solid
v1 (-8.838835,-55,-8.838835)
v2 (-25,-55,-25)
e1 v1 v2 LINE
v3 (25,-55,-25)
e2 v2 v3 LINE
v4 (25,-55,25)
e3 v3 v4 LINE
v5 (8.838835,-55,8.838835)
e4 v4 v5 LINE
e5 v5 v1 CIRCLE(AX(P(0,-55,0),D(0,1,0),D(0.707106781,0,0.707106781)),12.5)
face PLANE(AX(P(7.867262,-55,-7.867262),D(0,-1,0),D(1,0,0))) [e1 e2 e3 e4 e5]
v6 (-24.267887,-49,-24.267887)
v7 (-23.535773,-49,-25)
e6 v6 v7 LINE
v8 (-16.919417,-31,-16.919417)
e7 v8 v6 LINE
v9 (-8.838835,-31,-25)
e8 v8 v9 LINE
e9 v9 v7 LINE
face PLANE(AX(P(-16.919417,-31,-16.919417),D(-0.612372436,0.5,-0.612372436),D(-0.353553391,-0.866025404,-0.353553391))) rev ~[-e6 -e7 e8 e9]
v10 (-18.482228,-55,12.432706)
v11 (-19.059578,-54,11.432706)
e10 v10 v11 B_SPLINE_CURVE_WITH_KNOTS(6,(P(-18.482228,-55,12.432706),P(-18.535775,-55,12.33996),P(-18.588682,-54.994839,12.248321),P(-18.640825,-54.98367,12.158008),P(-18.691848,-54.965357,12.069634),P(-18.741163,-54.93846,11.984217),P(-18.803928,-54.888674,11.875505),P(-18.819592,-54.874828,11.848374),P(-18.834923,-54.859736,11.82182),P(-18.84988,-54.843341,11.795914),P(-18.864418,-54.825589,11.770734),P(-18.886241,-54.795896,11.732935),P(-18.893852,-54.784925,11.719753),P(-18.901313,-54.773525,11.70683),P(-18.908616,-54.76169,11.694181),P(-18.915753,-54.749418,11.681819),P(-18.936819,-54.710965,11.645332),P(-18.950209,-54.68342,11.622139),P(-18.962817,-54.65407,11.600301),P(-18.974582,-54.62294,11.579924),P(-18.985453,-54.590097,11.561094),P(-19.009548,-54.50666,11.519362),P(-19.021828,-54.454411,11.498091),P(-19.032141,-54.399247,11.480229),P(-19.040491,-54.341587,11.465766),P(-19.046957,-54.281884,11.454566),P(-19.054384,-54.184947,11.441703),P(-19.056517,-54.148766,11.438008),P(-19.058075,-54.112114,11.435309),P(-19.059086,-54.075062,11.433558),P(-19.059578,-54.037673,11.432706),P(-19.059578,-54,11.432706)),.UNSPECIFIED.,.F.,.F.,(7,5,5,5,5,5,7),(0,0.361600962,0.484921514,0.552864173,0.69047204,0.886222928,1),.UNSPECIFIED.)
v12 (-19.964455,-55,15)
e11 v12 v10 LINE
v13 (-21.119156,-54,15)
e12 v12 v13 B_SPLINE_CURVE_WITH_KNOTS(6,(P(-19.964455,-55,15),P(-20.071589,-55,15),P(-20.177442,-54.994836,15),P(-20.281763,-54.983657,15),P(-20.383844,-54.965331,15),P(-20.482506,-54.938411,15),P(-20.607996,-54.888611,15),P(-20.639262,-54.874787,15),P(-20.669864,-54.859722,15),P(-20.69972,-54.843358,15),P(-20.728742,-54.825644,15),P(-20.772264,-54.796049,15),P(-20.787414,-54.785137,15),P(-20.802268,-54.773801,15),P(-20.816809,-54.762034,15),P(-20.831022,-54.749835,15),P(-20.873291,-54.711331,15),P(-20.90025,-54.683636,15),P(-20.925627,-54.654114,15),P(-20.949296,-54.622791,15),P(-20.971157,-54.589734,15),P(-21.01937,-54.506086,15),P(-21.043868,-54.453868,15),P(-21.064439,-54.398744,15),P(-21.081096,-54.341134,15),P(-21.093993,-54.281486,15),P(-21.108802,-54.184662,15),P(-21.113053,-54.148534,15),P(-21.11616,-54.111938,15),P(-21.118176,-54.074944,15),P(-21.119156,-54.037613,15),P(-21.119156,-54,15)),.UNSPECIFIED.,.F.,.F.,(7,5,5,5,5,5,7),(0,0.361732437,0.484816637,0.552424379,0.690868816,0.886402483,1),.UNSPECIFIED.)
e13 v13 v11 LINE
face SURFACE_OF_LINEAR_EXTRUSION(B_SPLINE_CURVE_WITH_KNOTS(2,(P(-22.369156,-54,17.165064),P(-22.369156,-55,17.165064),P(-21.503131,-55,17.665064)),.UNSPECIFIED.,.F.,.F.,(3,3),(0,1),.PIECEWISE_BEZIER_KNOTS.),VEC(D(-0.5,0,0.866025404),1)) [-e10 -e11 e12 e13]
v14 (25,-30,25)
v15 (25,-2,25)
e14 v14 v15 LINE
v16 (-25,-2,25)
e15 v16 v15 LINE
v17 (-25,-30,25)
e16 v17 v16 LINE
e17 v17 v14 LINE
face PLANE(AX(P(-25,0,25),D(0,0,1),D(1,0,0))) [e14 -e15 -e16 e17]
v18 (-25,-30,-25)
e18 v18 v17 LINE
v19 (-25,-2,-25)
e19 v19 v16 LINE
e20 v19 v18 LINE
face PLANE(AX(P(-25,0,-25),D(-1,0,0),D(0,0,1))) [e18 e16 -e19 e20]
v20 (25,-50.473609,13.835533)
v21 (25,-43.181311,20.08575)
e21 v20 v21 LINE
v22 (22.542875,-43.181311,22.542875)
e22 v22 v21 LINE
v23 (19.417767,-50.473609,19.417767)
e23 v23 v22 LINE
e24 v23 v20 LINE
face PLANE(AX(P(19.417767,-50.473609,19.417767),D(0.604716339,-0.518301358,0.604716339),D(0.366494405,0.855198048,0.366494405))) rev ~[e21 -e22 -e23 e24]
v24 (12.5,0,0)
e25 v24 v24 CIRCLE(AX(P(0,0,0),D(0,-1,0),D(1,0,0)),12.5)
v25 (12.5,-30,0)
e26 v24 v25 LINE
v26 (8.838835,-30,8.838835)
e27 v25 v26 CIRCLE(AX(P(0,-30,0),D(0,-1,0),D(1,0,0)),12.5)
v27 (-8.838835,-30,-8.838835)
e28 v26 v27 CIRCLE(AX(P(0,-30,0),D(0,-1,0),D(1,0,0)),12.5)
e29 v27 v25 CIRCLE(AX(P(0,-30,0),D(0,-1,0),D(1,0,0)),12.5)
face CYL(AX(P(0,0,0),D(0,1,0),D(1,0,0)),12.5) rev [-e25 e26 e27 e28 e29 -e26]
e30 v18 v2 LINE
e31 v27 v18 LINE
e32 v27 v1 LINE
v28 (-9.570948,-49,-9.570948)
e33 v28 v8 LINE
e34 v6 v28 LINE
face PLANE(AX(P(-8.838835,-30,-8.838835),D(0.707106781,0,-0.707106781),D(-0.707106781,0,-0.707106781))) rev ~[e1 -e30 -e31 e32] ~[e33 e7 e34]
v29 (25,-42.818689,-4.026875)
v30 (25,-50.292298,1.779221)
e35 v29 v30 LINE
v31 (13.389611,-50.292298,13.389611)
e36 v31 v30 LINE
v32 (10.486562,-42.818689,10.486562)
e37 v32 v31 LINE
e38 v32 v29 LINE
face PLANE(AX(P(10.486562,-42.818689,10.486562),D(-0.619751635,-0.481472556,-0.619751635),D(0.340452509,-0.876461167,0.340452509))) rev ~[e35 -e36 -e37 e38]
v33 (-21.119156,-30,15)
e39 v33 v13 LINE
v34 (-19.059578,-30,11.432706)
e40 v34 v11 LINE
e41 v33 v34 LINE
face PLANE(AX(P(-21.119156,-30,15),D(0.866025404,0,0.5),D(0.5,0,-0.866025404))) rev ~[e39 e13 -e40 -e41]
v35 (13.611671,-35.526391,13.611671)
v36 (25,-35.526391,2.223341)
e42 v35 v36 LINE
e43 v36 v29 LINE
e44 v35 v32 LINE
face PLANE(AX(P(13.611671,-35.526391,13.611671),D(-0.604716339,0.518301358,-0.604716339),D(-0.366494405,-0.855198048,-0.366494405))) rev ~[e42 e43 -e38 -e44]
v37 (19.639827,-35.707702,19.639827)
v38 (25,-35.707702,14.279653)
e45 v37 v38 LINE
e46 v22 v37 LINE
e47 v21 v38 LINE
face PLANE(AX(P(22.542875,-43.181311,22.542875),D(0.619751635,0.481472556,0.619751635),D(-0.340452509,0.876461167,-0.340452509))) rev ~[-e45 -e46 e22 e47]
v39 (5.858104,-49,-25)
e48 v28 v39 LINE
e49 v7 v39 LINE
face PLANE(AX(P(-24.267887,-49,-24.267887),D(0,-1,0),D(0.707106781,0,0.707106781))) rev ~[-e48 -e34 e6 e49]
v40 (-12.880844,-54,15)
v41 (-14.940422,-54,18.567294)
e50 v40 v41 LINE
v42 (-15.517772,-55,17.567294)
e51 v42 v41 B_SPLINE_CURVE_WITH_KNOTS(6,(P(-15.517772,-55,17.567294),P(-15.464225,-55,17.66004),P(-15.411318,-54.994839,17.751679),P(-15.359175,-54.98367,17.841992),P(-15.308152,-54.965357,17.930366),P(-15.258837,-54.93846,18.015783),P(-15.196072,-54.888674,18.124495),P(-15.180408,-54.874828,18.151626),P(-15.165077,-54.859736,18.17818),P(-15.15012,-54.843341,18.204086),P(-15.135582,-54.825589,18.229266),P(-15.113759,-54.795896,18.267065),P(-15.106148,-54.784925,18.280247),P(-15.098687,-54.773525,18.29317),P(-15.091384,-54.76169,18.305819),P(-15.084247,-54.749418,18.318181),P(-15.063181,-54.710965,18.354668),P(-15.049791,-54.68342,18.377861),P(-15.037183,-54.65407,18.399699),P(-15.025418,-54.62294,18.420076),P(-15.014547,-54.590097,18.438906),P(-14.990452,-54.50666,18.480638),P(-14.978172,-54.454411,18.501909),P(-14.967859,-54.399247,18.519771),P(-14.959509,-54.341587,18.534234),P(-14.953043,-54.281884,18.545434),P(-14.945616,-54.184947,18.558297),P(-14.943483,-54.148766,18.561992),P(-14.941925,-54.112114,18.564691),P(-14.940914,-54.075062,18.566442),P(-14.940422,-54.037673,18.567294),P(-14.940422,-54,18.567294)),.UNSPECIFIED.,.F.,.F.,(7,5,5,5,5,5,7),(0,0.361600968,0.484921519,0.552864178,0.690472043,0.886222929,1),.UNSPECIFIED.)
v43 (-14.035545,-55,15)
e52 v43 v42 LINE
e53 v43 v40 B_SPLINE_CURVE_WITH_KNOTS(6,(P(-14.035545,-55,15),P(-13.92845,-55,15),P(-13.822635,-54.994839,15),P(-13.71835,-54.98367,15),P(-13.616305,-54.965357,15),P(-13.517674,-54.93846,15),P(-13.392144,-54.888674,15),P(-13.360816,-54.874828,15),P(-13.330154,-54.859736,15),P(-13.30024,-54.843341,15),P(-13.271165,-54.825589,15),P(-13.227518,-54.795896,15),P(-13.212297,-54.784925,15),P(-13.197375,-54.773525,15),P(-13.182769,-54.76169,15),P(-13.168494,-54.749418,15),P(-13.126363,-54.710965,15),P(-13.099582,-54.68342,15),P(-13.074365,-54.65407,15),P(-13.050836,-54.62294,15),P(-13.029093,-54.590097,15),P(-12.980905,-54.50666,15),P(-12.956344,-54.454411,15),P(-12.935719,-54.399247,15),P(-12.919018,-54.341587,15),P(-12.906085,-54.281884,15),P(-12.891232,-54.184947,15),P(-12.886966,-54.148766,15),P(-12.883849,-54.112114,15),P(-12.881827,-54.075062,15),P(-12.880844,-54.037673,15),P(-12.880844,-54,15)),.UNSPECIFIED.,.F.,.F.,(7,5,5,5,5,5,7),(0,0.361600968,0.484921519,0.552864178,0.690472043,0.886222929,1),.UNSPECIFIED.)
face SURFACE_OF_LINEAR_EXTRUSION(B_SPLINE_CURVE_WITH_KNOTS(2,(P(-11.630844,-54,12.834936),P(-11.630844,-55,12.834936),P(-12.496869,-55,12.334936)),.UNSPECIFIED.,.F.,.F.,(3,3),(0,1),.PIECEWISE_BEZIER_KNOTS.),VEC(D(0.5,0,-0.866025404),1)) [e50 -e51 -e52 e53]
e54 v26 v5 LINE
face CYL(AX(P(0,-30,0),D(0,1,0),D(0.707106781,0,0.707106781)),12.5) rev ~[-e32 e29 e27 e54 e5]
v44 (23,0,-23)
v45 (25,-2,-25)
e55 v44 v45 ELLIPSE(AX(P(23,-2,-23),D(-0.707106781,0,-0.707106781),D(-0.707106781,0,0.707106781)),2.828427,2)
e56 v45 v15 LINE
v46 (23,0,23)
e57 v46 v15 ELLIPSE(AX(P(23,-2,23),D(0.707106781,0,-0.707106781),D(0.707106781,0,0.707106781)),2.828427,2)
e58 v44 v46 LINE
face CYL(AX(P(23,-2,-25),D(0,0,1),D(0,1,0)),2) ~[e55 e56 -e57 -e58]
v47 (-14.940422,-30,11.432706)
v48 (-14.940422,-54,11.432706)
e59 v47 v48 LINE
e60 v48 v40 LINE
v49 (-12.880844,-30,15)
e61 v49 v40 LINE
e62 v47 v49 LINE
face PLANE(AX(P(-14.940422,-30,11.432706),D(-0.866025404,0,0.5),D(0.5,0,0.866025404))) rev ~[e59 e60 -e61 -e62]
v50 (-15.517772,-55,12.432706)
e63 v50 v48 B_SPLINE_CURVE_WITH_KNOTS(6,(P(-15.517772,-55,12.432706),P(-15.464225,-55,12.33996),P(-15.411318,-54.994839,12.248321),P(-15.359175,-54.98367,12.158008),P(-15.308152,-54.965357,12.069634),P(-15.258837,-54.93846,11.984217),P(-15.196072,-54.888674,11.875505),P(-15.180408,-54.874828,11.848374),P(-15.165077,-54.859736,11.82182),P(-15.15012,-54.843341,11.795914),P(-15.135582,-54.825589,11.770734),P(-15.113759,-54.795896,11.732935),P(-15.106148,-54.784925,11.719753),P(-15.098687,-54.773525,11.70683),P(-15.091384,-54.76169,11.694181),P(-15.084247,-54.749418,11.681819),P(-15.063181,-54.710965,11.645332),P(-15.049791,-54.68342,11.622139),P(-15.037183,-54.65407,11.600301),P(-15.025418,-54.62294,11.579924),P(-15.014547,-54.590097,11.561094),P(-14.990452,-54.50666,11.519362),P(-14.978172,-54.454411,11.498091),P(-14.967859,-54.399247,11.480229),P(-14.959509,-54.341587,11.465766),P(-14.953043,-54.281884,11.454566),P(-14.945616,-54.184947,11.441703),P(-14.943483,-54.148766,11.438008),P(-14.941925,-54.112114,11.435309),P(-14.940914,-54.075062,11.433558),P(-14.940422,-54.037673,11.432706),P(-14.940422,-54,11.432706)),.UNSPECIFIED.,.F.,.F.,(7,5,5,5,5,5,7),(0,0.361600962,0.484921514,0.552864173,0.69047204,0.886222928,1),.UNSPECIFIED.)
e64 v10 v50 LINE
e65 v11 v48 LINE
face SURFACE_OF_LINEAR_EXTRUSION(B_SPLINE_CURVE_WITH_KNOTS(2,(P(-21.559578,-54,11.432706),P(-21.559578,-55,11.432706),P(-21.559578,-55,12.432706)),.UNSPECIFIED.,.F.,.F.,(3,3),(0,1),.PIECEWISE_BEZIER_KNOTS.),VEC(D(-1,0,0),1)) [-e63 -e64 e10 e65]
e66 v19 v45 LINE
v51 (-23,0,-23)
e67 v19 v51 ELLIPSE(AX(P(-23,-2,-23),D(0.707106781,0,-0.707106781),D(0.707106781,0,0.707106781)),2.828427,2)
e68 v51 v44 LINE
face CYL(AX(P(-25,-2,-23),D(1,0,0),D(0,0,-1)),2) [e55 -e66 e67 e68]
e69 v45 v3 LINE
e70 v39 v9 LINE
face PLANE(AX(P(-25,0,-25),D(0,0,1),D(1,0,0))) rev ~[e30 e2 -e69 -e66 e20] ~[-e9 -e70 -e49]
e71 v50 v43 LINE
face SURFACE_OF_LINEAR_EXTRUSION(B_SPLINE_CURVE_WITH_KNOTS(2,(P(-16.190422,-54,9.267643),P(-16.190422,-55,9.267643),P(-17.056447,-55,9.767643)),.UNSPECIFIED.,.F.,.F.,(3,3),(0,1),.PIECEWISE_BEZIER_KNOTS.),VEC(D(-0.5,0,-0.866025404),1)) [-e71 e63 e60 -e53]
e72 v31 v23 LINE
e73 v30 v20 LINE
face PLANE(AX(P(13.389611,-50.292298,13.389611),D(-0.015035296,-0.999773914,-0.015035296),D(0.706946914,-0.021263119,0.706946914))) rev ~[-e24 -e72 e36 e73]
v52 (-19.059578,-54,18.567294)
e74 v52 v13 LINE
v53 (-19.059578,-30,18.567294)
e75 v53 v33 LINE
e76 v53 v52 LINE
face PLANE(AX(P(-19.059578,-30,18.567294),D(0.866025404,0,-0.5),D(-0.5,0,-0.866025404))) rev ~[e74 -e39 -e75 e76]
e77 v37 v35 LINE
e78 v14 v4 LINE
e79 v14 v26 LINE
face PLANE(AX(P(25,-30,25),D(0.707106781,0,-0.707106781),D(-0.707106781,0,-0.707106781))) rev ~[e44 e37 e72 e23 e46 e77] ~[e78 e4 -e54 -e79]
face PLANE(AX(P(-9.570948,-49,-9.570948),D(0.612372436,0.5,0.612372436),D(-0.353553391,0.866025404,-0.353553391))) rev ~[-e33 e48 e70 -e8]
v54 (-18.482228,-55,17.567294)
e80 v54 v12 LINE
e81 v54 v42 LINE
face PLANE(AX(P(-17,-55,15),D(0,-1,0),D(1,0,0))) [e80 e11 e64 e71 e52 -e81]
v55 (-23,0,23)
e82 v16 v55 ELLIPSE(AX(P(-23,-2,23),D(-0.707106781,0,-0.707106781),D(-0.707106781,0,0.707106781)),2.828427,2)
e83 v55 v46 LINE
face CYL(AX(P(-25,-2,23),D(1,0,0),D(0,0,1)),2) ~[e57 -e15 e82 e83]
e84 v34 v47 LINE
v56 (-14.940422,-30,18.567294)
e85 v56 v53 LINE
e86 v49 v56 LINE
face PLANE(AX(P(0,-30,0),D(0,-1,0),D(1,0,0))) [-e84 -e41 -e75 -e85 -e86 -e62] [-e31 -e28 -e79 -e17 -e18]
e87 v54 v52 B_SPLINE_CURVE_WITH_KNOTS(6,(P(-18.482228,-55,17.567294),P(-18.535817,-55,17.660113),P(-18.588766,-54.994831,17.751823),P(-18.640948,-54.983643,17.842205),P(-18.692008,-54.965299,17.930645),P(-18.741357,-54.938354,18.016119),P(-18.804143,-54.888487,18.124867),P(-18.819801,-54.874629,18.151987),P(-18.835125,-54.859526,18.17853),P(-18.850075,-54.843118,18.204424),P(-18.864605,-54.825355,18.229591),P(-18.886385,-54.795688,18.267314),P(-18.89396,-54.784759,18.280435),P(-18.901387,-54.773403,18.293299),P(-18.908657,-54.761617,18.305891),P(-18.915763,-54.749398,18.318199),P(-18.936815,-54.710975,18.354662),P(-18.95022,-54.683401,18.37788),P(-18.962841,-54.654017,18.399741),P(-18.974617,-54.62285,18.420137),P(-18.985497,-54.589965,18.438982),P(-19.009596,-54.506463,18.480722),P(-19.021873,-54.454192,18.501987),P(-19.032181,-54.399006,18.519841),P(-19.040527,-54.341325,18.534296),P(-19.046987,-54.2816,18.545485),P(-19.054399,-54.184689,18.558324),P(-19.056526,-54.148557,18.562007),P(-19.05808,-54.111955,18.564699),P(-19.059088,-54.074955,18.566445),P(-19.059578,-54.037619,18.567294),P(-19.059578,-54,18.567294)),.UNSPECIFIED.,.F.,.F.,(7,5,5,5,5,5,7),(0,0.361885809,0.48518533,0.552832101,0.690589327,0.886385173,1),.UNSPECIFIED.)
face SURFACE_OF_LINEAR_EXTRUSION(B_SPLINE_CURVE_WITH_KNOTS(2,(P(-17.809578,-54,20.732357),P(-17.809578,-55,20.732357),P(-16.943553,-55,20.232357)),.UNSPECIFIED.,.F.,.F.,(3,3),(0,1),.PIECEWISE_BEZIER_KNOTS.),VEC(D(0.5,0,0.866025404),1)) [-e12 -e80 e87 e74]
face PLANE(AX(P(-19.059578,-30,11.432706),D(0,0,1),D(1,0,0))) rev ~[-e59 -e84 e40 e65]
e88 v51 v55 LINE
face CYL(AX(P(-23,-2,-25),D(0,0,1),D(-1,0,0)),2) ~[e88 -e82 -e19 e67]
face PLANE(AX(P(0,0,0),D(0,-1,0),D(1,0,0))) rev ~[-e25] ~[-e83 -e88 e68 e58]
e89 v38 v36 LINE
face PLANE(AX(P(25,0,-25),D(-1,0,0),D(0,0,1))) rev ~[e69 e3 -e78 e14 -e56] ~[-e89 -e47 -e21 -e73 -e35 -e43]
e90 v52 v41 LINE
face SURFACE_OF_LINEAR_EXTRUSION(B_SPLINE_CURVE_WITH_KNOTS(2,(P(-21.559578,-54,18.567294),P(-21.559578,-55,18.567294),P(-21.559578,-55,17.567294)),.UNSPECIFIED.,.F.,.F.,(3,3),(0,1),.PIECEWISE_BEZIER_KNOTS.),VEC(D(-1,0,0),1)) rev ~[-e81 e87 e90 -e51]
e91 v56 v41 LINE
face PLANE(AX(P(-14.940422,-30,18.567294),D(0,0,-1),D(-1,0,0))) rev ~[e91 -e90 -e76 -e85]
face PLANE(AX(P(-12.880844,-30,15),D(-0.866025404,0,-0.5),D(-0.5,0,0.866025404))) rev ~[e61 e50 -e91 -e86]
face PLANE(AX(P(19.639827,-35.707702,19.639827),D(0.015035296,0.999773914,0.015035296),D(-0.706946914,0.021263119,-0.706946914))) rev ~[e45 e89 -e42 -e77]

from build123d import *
from build123d import SkipClean  # not in build123d's __all__

# Parameters (mm, degrees)
F0_W        = 50
F0_H        = 50
F0_R        = 12.5
F1_DEPTH    = 30
F2_DEPTH    = 25
F4_DEPTH    = 25
F6_DEPTH    = 50
F8_DEPTH    = 25
F9_T1_DEPTH = 9.1191559928
F9_T3_DEPTH = 9.1191559928
F9_T5_DEPTH = 9.1191559928
F9_T7_DEPTH = 9.1191559928
F9_T9_DEPTH = 9.1191559928
F10_R       = 2


# Not quite as in the source:
# - a fillet or chamfer that OpenCascade refuses, or shapes differently, is made with other operations: its cross-section is extruded or revolved along the edge and cut away or added
# - after a boolean that leaves OpenCascade's solid faulty, fix() repairs it


with BuildPart() as f1:
    # F0 (on Front) → F1 (new body)
    with BuildSketch(Plane.XZ):
        Rectangle(F0_W, F0_H)
        Circle(F0_R, mode=Mode.SUBTRACT)
    extrude(amount=F1_DEPTH)

    # F0 (on Front) → F2 (join)
    with BuildSketch(Plane.XZ):
        Rectangle(F0_W, F0_H)
        Circle(F0_R, mode=Mode.SUBTRACT)
    extrude(amount=F2_DEPTH)

    # F3 (on face) → F4 (join)
    with BuildSketch(Plane.XZ.offset(30)):
        with BuildLine():
            Line((-8.8388347648, -8.8388347648), (-25, -25))
            Line((-25, -25), (25, -25))
            Line((25, -25), (25, 25))
            Line((25, 25), (8.8388347648, 8.8388347648))
            ThreePointArc((8.8388347648, 8.8388347648), (8.8388347648, -8.8388347648), (-8.8388347648, -8.8388347648))
        make_face()
    with SkipClean():  # cleaning this boolean's faces spoils the solid; the shape is the same uncleaned
        extrude(amount=F4_DEPTH)

    # F5 (on face) → F6 (cut)
    with BuildSketch(Plane(origin=(0, 0, 0), x_dir=(0.7071067812, 0, 0.7071067812), z_dir=(-0.7071067812, 0, 0.7071067812))):
        Polygon((-23.9276695297, -31), (-34.3199743751, -49), (-13.5353646843, -49), align=None)
        Polygon((19.249809042, -35.5263909924), (14.8302387921, -42.8186887872), (18.9357688095, -50.2922977948), (27.4608690767, -50.4736090076), (31.8804393265, -43.1813112128), (27.7749093092, -35.7077022052), align=None)
    extrude(amount=-F6_DEPTH, mode=Mode.SUBTRACT)

    add(f1.part.fix(), mode=Mode.REPLACE)

    # F7 (on face) → F8 (join)
    with BuildSketch(Plane.XZ.offset(30)):
        Polygon((-19.0595779964, 11.4327062681), (-14.9404220036, 11.4327062681), (-12.8808440072, 15), (-14.9404220036, 18.5672937319), (-19.0595779964, 18.5672937319), (-21.1191559928, 15), align=None)
    extrude(amount=F8_DEPTH)

    # F9: fillet of radius 1 on 6 edges, made by hand

    # F9_s2 → F9_t1 (cut)
    with BuildSketch(Plane(origin=(4.5249795266, 0, 7.8374944433), x_dir=(0, 1, 0), z_dir=(-0.5, 0, -0.8660254038))):
        with BuildLine():
            add(Edge.make_bspline(
                [(-54, -25.7897255963), (-55, -25.7897255963), (-55, -24.7897255963)],
                knots=[0, 0, 0, 1, 1, 1], degree=2, weights=[1, 1, 1]))
            Line((-55, -24.7897255963), (-55, -25.7897255963))
            Line((-55, -25.7897255963), (-54, -25.7897255963))
        make_face()
    extrude(amount=F9_T1_DEPTH, mode=Mode.SUBTRACT)

    # F9_s4 → F9_t3 (cut)
    with BuildSketch(Plane(origin=(-13.0249795266, 0, 22.5599263076), x_dir=(0, 1, 0), z_dir=(0.5, 0, -0.8660254038))):
        with BuildLine():
            add(Edge.make_bspline(
                [(-54, -10.7897255963), (-55, -10.7897255963), (-55, -9.7897255963)],
                knots=[0, 0, 0, 1, 1, 1], degree=2, weights=[1, 1, 1]))
            Line((-55, -9.7897255963), (-55, -10.7897255963))
            Line((-55, -10.7897255963), (-54, -10.7897255963))
        make_face()
    extrude(amount=F9_T3_DEPTH, mode=Mode.SUBTRACT)

    # F9_s6 → F9_t5 (cut)
    with BuildSketch(Plane.YZ.offset(-21.5595779964)):
        with BuildLine():
            add(Edge.make_bspline(
                [(-54, 11.4327062681), (-55, 11.4327062681), (-55, 12.4327062681)],
                knots=[0, 0, 0, 1, 1, 1], degree=2, weights=[1, 1, 1]))
            Line((-55, 12.4327062681), (-55, 11.4327062681))
            Line((-55, 11.4327062681), (-54, 11.4327062681))
        make_face()
        with BuildLine():
            add(Edge.make_bspline(
                [(-54, 18.5672937319), (-55, 18.5672937319), (-55, 17.5672937319)],
                knots=[0, 0, 0, 1, 1, 1], degree=2, weights=[1, 1, 1]))
            Line((-55, 17.5672937319), (-55, 18.5672937319))
            Line((-55, 18.5672937319), (-54, 18.5672937319))
        make_face()
    extrude(amount=F9_T5_DEPTH, mode=Mode.SUBTRACT)

    # F9_s8 → F9_t7 (cut)
    with BuildSketch(Plane(origin=(-0.0345984698, 0, -0.0599263076), x_dir=(0, 1, 0), z_dir=(0.5, 0, 0.8660254038))):
        with BuildLine():
            add(Edge.make_bspline(
                [(-54, 18.6551381324), (-55, 18.6551381324), (-55, 19.6551381324)],
                knots=[0, 0, 0, 1, 1, 1], degree=2, weights=[1, 1, 1]))
            Line((-55, 19.6551381324), (-55, 18.6551381324))
            Line((-55, 18.6551381324), (-54, 18.6551381324))
        make_face()
    extrude(amount=F9_T7_DEPTH, mode=Mode.SUBTRACT)

    # F9_s10 → F9_t9 (cut)
    with BuildSketch(Plane(origin=(-8.4654015302, 0, 14.6625055567), x_dir=(0, 1, 0), z_dir=(-0.5, 0, 0.8660254038))):
        with BuildLine():
            add(Edge.make_bspline(
                [(-54, 3.6551381324), (-55, 3.6551381324), (-55, 4.6551381324)],
                knots=[0, 0, 0, 1, 1, 1], degree=2, weights=[1, 1, 1]))
            Line((-55, 4.6551381324), (-55, 3.6551381324))
            Line((-55, 3.6551381324), (-54, 3.6551381324))
        make_face()
    extrude(amount=F9_T9_DEPTH, mode=Mode.SUBTRACT)

    # F10
    f10_edges = [f1.edges().sort_by_distance(p)[0] for p in [
        (25, 0, 0),
        (0, 0, -25),
        (-25, 0, 0),
        (0, 0, 25),
    ]]
    fillet(f10_edges, radius=F10_R)


solid = f1.part
